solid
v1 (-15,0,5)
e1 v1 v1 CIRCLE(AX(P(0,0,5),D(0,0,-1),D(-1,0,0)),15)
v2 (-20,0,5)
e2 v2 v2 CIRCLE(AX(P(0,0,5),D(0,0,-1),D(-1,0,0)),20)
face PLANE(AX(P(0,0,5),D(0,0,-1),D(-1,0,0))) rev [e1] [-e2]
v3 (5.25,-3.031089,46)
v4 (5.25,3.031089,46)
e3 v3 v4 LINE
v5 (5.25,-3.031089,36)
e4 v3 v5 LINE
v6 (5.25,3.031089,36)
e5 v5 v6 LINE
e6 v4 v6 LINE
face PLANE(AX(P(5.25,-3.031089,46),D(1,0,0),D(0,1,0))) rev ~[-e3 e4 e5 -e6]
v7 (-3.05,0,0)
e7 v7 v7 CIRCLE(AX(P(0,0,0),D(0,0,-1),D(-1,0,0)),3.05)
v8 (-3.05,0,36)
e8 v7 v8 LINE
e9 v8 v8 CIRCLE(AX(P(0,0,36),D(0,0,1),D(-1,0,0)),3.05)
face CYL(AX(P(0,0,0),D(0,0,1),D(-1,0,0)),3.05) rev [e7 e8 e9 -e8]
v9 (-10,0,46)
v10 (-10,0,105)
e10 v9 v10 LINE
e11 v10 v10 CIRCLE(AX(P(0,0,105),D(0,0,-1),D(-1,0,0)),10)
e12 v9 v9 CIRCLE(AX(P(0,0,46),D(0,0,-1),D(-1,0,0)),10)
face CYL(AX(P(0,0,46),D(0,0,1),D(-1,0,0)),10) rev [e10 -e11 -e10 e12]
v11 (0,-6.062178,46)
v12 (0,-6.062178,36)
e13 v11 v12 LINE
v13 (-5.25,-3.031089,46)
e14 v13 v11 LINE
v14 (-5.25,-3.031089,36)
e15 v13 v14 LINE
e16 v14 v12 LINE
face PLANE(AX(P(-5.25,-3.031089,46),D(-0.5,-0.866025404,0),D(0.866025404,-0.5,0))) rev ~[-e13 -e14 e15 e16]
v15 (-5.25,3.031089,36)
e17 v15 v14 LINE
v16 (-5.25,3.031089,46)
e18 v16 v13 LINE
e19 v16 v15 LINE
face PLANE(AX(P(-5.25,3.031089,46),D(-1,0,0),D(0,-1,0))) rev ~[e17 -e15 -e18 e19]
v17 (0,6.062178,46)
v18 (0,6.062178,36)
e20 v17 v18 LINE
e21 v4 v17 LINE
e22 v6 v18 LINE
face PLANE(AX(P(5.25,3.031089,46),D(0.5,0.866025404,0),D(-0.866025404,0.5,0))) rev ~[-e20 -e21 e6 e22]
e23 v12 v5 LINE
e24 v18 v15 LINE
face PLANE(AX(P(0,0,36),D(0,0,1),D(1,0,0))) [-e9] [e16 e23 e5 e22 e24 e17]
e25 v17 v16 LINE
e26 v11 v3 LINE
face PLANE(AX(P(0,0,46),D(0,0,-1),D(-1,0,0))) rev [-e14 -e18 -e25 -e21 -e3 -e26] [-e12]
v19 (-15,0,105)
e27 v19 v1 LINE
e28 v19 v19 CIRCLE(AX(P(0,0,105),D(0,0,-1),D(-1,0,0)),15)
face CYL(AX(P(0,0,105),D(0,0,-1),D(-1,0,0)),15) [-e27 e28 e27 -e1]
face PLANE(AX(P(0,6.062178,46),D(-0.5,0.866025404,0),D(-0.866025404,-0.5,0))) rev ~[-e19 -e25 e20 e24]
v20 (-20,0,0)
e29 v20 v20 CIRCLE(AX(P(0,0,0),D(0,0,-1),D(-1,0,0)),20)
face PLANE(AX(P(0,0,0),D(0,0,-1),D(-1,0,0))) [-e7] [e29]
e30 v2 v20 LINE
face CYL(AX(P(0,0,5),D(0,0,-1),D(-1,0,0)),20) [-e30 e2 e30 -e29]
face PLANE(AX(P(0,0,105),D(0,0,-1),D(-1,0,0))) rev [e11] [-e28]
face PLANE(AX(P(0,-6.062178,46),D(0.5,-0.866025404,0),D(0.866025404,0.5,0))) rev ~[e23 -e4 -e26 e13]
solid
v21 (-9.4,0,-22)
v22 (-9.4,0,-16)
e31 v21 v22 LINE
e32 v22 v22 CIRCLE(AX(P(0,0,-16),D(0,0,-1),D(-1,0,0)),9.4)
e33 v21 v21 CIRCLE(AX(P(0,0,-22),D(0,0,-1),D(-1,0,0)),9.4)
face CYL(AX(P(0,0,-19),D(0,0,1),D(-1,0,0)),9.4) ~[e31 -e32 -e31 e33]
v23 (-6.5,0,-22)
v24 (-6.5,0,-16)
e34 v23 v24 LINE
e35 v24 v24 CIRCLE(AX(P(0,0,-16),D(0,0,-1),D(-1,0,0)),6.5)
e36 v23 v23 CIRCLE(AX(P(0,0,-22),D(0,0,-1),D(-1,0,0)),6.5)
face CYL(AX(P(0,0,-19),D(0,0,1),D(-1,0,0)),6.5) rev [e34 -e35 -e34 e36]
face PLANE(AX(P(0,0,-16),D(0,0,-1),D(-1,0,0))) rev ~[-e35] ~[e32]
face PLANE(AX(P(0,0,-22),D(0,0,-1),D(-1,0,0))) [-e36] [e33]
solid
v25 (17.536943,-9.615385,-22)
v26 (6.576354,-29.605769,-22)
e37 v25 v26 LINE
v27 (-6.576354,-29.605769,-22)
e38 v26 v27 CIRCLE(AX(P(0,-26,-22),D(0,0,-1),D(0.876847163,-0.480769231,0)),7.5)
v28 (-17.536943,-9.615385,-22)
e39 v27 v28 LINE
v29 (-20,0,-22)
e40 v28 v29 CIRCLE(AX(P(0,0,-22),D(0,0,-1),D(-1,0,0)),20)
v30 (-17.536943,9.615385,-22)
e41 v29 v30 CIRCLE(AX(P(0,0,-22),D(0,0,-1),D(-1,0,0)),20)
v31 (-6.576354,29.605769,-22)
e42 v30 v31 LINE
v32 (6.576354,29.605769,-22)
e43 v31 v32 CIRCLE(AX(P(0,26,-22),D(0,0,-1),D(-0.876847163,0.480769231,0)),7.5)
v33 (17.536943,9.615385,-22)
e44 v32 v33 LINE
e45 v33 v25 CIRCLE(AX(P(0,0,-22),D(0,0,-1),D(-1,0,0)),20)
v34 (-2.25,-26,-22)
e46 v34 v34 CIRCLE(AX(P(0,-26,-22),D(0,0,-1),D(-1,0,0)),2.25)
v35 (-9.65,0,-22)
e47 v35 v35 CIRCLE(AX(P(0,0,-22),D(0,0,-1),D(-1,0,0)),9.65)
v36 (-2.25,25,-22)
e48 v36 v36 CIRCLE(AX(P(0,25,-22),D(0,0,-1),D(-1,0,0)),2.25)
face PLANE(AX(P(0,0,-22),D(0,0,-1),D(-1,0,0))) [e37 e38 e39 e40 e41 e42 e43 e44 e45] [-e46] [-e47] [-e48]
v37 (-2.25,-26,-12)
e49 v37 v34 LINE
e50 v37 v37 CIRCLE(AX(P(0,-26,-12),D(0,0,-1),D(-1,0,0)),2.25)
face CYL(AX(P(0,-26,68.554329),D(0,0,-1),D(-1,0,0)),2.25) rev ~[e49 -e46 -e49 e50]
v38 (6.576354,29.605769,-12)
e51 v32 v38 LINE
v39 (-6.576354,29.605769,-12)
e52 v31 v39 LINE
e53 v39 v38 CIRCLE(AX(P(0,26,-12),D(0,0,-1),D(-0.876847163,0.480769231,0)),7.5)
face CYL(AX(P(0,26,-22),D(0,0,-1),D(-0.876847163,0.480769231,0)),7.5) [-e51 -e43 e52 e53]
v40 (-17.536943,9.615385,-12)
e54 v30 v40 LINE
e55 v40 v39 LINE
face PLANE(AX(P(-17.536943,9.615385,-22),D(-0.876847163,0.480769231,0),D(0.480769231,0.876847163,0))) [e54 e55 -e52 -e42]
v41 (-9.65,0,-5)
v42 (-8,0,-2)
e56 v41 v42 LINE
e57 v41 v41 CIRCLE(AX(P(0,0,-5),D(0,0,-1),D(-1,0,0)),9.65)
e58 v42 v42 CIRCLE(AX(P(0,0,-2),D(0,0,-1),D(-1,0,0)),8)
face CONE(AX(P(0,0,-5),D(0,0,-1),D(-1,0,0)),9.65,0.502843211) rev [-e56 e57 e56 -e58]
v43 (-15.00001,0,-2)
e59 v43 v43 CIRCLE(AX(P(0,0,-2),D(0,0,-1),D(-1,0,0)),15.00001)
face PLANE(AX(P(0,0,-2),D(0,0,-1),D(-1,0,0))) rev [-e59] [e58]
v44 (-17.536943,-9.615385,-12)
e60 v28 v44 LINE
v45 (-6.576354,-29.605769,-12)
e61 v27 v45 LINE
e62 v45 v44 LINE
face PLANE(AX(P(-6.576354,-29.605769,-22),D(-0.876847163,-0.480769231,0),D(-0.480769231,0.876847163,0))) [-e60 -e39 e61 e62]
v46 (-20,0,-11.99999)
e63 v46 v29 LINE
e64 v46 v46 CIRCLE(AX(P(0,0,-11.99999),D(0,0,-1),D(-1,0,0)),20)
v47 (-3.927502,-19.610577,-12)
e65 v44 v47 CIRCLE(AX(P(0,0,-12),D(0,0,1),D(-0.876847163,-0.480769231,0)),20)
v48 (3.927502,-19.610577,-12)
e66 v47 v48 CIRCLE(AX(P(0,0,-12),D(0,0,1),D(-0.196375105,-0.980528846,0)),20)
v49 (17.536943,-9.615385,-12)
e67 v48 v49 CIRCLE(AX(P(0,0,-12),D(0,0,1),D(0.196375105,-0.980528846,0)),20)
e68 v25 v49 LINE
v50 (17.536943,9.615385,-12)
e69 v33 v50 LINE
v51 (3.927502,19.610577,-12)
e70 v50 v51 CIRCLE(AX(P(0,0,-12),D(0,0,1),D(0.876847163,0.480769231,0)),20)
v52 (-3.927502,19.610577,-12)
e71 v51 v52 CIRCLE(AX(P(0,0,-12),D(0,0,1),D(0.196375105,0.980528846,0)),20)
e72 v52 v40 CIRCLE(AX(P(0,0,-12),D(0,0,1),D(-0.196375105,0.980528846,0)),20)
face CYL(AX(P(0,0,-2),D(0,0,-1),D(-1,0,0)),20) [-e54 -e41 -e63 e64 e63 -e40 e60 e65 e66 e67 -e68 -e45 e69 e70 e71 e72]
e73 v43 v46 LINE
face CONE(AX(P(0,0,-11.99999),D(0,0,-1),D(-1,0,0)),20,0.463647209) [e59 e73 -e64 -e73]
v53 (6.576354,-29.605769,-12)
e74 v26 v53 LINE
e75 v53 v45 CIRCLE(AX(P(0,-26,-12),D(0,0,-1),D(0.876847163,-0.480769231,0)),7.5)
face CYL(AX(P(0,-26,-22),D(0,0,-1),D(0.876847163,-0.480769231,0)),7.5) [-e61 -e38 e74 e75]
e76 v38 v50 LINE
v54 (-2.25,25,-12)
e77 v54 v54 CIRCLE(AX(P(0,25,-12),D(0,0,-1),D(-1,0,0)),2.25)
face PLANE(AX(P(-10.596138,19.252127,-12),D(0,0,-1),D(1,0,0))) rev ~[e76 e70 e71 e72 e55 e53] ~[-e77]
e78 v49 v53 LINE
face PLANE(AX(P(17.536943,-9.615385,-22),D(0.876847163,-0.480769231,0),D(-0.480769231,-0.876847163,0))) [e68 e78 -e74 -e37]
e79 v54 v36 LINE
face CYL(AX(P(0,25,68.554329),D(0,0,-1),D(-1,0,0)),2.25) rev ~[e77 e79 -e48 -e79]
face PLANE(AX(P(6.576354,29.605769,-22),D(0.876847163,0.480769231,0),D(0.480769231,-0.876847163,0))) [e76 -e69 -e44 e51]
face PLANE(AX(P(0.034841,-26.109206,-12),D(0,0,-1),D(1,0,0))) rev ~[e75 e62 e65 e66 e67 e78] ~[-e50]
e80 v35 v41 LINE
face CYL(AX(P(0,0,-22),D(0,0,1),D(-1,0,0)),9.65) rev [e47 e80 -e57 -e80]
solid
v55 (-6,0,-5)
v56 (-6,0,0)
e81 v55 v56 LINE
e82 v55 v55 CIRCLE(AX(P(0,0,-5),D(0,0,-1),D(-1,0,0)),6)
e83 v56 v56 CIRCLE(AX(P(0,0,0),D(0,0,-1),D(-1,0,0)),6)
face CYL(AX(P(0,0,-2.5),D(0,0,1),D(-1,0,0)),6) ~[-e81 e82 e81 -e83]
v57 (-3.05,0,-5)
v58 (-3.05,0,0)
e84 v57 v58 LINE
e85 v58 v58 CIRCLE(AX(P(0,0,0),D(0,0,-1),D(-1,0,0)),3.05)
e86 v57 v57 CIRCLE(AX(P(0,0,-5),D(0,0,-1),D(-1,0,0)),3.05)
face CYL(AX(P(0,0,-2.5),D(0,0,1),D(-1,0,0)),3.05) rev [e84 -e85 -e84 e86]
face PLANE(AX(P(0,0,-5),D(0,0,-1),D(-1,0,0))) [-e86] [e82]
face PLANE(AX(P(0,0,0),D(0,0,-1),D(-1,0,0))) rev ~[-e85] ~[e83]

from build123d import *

# Parameters (mm, degrees)
F3_DEPTH  = 10
F0_W      = 2.95
F0_H      = 5
F0_W_2    = 2.9
F0_H_2    = 6
F7_DEPTH  = 10
F9_D      = 4.5
F10_SIZE2 = 9.99999
F10_SIZE  = 4.99999


# Not quite as in the source:
# - a fillet or chamfer is up to 0.001 mm smaller than in the source, because OpenCascade refuses the exact size
# - a feature of the source that left no trace in its solid (it failed there, or was rolled back) is left out


with BuildPart() as f1:
    # F0 (on Front) → F1 (revolve)
    with BuildSketch(Plane.XZ):
        Polygon((-20, 5), (-20, 0), (-6, 0), (-3.05, 0), (-3.05, 46), (-10, 46), (-10, 105), (-15, 105), (-15, 5), align=None)
    revolve(axis=Axis((0, 0, -11.1144582044), (0, 0, -1)))

    # F2 (on face) → F3 (cut)
    with BuildSketch(Plane.XY.offset(46)):
        Polygon((0, -6.0621778265), (5.25, -3.0310889132), (5.25, 3.0310889132), (0, 6.0621778265), (-5.25, 3.0310889132), (-5.25, -3.0310889132), align=None)
    extrude(amount=-F3_DEPTH, mode=Mode.SUBTRACT)


with BuildPart() as f4:
    # F0 (on Front) → F4 (revolve)
    with BuildSketch(Plane.XZ):
        with Locations((-4.525, -2.5)):
            Rectangle(F0_W, F0_H)
    revolve(axis=Axis((0, 0, -11.1144582044), (0, 0, -1)))


with BuildPart() as f5:
    # F0 (on Front) → F5 (revolve)
    with BuildSketch(Plane.XZ):
        Polygon((-9.65, -5), (-8, -2), (-20, -2), (-20, -22), (-9.65, -22), align=None)
    revolve(axis=Axis((0, 0, -11.1144582044), (0, 0, -1)))

    # F6 (on face) → F7 (join)
    with BuildSketch(Plane(origin=(0, 0, -22), x_dir=(1, 0, 0), z_dir=(0, 0, -1))):
        with BuildLine():
            ThreePointArc((-3.9275020998, -19.6105769231), (-11.8387740457, -16.1196597078), (-17.5369432541, -9.6153846154))
            Line((-17.5369432541, -9.6153846154), (-6.5763537203, -29.6057692308))
            ThreePointArc((-6.5763537203, -29.6057692308), (-7.249738898, -24.0787280488), (-3.9275020998, -19.6105769231))
        make_face()
        with BuildLine():
            ThreePointArc((-3.9275020998, -19.6105769231), (-7.249738898, -24.0787280488), (-6.5763537203, -29.6057692308))
            ThreePointArc((-6.5763537203, -29.6057692308), (0, -33.5), (6.5763537203, -29.6057692308))
            ThreePointArc((6.5763537203, -29.6057692308), (7.2654199088, -27.8610947179), (7.5, -26))
            ThreePointArc((7.5, -26), (6.5462304324, -22.3398268995), (3.9275020998, -19.6105769231))
            ThreePointArc((3.9275020998, -19.6105769231), (0, -20), (-3.9275020998, -19.6105769231))
        make_face()
        with BuildLine():
            Line((6.5763537203, -29.6057692308), (17.5369432541, -9.6153846154))
            ThreePointArc((17.5369432541, -9.6153846154), (11.8387740457, -16.1196597078), (3.9275020998, -19.6105769231))
            ThreePointArc((3.9275020998, -19.6105769231), (6.5462304324, -22.3398268995), (7.5, -26))
            ThreePointArc((7.5, -26), (7.2654199088, -27.8610947179), (6.5763537203, -29.6057692308))
        make_face()
        with BuildLine():
            ThreePointArc((3.9275020998, 19.6105769231), (6.5462304324, 22.3398268995), (7.5, 26))
            ThreePointArc((7.5, 26), (7.2654199088, 27.8610947179), (6.5763537203, 29.6057692308))
            ThreePointArc((6.5763537203, 29.6057692308), (0, 33.5), (-6.5763537203, 29.6057692308))
            ThreePointArc((-6.5763537203, 29.6057692308), (-7.249738898, 24.0787280488), (-3.9275020998, 19.6105769231))
            ThreePointArc((-3.9275020998, 19.6105769231), (0, 20), (3.9275020998, 19.6105769231))
        make_face()
        with BuildLine():
            ThreePointArc((6.5763537203, 29.6057692308), (7.2654199088, 27.8610947179), (7.5, 26))
            ThreePointArc((7.5, 26), (6.5462304324, 22.3398268995), (3.9275020998, 19.6105769231))
            ThreePointArc((3.9275020998, 19.6105769231), (11.8387740457, 16.1196597078), (17.5369432541, 9.6153846154))
            Line((17.5369432541, 9.6153846154), (6.5763537203, 29.6057692308))
        make_face()
        with BuildLine():
            ThreePointArc((-3.9275020998, 19.6105769231), (-7.249738898, 24.0787280488), (-6.5763537203, 29.6057692308))
            Line((-6.5763537203, 29.6057692308), (-17.5369432541, 9.6153846154))
            ThreePointArc((-17.5369432541, 9.6153846154), (-11.8387740457, 16.1196597078), (-3.9275020998, 19.6105769231))
        make_face()
    extrude(amount=-F7_DEPTH)

    # F9 (through all)
    with Locations(Plane.XY.offset(-12)):
        with Locations((0, -26), (0, 25)):
            Hole(F9_D / 2)

    # F10 (size 5 and 10 in the source; OpenCascade refuses exactly that, so slightly less here)
    f10_edges = [f5.edges().sort_by_distance(p)[0] for p in [
        (20, 0, -2),
    ]]
    chamfer(f10_edges, length=F10_SIZE, length2=F10_SIZE2)


with BuildPart() as f5b:
    # F0 (on Front) → F5, piece 2 (revolve)
    with BuildSketch(Plane.XZ):
        with Locations((-7.95, -19)):
            Rectangle(F0_W_2, F0_H_2)
    revolve(axis=Axis((0, 0, -11.1144582044), (0, 0, -1)))


solid = Compound([f1.part, f4.part, f5.part, f5b.part])
